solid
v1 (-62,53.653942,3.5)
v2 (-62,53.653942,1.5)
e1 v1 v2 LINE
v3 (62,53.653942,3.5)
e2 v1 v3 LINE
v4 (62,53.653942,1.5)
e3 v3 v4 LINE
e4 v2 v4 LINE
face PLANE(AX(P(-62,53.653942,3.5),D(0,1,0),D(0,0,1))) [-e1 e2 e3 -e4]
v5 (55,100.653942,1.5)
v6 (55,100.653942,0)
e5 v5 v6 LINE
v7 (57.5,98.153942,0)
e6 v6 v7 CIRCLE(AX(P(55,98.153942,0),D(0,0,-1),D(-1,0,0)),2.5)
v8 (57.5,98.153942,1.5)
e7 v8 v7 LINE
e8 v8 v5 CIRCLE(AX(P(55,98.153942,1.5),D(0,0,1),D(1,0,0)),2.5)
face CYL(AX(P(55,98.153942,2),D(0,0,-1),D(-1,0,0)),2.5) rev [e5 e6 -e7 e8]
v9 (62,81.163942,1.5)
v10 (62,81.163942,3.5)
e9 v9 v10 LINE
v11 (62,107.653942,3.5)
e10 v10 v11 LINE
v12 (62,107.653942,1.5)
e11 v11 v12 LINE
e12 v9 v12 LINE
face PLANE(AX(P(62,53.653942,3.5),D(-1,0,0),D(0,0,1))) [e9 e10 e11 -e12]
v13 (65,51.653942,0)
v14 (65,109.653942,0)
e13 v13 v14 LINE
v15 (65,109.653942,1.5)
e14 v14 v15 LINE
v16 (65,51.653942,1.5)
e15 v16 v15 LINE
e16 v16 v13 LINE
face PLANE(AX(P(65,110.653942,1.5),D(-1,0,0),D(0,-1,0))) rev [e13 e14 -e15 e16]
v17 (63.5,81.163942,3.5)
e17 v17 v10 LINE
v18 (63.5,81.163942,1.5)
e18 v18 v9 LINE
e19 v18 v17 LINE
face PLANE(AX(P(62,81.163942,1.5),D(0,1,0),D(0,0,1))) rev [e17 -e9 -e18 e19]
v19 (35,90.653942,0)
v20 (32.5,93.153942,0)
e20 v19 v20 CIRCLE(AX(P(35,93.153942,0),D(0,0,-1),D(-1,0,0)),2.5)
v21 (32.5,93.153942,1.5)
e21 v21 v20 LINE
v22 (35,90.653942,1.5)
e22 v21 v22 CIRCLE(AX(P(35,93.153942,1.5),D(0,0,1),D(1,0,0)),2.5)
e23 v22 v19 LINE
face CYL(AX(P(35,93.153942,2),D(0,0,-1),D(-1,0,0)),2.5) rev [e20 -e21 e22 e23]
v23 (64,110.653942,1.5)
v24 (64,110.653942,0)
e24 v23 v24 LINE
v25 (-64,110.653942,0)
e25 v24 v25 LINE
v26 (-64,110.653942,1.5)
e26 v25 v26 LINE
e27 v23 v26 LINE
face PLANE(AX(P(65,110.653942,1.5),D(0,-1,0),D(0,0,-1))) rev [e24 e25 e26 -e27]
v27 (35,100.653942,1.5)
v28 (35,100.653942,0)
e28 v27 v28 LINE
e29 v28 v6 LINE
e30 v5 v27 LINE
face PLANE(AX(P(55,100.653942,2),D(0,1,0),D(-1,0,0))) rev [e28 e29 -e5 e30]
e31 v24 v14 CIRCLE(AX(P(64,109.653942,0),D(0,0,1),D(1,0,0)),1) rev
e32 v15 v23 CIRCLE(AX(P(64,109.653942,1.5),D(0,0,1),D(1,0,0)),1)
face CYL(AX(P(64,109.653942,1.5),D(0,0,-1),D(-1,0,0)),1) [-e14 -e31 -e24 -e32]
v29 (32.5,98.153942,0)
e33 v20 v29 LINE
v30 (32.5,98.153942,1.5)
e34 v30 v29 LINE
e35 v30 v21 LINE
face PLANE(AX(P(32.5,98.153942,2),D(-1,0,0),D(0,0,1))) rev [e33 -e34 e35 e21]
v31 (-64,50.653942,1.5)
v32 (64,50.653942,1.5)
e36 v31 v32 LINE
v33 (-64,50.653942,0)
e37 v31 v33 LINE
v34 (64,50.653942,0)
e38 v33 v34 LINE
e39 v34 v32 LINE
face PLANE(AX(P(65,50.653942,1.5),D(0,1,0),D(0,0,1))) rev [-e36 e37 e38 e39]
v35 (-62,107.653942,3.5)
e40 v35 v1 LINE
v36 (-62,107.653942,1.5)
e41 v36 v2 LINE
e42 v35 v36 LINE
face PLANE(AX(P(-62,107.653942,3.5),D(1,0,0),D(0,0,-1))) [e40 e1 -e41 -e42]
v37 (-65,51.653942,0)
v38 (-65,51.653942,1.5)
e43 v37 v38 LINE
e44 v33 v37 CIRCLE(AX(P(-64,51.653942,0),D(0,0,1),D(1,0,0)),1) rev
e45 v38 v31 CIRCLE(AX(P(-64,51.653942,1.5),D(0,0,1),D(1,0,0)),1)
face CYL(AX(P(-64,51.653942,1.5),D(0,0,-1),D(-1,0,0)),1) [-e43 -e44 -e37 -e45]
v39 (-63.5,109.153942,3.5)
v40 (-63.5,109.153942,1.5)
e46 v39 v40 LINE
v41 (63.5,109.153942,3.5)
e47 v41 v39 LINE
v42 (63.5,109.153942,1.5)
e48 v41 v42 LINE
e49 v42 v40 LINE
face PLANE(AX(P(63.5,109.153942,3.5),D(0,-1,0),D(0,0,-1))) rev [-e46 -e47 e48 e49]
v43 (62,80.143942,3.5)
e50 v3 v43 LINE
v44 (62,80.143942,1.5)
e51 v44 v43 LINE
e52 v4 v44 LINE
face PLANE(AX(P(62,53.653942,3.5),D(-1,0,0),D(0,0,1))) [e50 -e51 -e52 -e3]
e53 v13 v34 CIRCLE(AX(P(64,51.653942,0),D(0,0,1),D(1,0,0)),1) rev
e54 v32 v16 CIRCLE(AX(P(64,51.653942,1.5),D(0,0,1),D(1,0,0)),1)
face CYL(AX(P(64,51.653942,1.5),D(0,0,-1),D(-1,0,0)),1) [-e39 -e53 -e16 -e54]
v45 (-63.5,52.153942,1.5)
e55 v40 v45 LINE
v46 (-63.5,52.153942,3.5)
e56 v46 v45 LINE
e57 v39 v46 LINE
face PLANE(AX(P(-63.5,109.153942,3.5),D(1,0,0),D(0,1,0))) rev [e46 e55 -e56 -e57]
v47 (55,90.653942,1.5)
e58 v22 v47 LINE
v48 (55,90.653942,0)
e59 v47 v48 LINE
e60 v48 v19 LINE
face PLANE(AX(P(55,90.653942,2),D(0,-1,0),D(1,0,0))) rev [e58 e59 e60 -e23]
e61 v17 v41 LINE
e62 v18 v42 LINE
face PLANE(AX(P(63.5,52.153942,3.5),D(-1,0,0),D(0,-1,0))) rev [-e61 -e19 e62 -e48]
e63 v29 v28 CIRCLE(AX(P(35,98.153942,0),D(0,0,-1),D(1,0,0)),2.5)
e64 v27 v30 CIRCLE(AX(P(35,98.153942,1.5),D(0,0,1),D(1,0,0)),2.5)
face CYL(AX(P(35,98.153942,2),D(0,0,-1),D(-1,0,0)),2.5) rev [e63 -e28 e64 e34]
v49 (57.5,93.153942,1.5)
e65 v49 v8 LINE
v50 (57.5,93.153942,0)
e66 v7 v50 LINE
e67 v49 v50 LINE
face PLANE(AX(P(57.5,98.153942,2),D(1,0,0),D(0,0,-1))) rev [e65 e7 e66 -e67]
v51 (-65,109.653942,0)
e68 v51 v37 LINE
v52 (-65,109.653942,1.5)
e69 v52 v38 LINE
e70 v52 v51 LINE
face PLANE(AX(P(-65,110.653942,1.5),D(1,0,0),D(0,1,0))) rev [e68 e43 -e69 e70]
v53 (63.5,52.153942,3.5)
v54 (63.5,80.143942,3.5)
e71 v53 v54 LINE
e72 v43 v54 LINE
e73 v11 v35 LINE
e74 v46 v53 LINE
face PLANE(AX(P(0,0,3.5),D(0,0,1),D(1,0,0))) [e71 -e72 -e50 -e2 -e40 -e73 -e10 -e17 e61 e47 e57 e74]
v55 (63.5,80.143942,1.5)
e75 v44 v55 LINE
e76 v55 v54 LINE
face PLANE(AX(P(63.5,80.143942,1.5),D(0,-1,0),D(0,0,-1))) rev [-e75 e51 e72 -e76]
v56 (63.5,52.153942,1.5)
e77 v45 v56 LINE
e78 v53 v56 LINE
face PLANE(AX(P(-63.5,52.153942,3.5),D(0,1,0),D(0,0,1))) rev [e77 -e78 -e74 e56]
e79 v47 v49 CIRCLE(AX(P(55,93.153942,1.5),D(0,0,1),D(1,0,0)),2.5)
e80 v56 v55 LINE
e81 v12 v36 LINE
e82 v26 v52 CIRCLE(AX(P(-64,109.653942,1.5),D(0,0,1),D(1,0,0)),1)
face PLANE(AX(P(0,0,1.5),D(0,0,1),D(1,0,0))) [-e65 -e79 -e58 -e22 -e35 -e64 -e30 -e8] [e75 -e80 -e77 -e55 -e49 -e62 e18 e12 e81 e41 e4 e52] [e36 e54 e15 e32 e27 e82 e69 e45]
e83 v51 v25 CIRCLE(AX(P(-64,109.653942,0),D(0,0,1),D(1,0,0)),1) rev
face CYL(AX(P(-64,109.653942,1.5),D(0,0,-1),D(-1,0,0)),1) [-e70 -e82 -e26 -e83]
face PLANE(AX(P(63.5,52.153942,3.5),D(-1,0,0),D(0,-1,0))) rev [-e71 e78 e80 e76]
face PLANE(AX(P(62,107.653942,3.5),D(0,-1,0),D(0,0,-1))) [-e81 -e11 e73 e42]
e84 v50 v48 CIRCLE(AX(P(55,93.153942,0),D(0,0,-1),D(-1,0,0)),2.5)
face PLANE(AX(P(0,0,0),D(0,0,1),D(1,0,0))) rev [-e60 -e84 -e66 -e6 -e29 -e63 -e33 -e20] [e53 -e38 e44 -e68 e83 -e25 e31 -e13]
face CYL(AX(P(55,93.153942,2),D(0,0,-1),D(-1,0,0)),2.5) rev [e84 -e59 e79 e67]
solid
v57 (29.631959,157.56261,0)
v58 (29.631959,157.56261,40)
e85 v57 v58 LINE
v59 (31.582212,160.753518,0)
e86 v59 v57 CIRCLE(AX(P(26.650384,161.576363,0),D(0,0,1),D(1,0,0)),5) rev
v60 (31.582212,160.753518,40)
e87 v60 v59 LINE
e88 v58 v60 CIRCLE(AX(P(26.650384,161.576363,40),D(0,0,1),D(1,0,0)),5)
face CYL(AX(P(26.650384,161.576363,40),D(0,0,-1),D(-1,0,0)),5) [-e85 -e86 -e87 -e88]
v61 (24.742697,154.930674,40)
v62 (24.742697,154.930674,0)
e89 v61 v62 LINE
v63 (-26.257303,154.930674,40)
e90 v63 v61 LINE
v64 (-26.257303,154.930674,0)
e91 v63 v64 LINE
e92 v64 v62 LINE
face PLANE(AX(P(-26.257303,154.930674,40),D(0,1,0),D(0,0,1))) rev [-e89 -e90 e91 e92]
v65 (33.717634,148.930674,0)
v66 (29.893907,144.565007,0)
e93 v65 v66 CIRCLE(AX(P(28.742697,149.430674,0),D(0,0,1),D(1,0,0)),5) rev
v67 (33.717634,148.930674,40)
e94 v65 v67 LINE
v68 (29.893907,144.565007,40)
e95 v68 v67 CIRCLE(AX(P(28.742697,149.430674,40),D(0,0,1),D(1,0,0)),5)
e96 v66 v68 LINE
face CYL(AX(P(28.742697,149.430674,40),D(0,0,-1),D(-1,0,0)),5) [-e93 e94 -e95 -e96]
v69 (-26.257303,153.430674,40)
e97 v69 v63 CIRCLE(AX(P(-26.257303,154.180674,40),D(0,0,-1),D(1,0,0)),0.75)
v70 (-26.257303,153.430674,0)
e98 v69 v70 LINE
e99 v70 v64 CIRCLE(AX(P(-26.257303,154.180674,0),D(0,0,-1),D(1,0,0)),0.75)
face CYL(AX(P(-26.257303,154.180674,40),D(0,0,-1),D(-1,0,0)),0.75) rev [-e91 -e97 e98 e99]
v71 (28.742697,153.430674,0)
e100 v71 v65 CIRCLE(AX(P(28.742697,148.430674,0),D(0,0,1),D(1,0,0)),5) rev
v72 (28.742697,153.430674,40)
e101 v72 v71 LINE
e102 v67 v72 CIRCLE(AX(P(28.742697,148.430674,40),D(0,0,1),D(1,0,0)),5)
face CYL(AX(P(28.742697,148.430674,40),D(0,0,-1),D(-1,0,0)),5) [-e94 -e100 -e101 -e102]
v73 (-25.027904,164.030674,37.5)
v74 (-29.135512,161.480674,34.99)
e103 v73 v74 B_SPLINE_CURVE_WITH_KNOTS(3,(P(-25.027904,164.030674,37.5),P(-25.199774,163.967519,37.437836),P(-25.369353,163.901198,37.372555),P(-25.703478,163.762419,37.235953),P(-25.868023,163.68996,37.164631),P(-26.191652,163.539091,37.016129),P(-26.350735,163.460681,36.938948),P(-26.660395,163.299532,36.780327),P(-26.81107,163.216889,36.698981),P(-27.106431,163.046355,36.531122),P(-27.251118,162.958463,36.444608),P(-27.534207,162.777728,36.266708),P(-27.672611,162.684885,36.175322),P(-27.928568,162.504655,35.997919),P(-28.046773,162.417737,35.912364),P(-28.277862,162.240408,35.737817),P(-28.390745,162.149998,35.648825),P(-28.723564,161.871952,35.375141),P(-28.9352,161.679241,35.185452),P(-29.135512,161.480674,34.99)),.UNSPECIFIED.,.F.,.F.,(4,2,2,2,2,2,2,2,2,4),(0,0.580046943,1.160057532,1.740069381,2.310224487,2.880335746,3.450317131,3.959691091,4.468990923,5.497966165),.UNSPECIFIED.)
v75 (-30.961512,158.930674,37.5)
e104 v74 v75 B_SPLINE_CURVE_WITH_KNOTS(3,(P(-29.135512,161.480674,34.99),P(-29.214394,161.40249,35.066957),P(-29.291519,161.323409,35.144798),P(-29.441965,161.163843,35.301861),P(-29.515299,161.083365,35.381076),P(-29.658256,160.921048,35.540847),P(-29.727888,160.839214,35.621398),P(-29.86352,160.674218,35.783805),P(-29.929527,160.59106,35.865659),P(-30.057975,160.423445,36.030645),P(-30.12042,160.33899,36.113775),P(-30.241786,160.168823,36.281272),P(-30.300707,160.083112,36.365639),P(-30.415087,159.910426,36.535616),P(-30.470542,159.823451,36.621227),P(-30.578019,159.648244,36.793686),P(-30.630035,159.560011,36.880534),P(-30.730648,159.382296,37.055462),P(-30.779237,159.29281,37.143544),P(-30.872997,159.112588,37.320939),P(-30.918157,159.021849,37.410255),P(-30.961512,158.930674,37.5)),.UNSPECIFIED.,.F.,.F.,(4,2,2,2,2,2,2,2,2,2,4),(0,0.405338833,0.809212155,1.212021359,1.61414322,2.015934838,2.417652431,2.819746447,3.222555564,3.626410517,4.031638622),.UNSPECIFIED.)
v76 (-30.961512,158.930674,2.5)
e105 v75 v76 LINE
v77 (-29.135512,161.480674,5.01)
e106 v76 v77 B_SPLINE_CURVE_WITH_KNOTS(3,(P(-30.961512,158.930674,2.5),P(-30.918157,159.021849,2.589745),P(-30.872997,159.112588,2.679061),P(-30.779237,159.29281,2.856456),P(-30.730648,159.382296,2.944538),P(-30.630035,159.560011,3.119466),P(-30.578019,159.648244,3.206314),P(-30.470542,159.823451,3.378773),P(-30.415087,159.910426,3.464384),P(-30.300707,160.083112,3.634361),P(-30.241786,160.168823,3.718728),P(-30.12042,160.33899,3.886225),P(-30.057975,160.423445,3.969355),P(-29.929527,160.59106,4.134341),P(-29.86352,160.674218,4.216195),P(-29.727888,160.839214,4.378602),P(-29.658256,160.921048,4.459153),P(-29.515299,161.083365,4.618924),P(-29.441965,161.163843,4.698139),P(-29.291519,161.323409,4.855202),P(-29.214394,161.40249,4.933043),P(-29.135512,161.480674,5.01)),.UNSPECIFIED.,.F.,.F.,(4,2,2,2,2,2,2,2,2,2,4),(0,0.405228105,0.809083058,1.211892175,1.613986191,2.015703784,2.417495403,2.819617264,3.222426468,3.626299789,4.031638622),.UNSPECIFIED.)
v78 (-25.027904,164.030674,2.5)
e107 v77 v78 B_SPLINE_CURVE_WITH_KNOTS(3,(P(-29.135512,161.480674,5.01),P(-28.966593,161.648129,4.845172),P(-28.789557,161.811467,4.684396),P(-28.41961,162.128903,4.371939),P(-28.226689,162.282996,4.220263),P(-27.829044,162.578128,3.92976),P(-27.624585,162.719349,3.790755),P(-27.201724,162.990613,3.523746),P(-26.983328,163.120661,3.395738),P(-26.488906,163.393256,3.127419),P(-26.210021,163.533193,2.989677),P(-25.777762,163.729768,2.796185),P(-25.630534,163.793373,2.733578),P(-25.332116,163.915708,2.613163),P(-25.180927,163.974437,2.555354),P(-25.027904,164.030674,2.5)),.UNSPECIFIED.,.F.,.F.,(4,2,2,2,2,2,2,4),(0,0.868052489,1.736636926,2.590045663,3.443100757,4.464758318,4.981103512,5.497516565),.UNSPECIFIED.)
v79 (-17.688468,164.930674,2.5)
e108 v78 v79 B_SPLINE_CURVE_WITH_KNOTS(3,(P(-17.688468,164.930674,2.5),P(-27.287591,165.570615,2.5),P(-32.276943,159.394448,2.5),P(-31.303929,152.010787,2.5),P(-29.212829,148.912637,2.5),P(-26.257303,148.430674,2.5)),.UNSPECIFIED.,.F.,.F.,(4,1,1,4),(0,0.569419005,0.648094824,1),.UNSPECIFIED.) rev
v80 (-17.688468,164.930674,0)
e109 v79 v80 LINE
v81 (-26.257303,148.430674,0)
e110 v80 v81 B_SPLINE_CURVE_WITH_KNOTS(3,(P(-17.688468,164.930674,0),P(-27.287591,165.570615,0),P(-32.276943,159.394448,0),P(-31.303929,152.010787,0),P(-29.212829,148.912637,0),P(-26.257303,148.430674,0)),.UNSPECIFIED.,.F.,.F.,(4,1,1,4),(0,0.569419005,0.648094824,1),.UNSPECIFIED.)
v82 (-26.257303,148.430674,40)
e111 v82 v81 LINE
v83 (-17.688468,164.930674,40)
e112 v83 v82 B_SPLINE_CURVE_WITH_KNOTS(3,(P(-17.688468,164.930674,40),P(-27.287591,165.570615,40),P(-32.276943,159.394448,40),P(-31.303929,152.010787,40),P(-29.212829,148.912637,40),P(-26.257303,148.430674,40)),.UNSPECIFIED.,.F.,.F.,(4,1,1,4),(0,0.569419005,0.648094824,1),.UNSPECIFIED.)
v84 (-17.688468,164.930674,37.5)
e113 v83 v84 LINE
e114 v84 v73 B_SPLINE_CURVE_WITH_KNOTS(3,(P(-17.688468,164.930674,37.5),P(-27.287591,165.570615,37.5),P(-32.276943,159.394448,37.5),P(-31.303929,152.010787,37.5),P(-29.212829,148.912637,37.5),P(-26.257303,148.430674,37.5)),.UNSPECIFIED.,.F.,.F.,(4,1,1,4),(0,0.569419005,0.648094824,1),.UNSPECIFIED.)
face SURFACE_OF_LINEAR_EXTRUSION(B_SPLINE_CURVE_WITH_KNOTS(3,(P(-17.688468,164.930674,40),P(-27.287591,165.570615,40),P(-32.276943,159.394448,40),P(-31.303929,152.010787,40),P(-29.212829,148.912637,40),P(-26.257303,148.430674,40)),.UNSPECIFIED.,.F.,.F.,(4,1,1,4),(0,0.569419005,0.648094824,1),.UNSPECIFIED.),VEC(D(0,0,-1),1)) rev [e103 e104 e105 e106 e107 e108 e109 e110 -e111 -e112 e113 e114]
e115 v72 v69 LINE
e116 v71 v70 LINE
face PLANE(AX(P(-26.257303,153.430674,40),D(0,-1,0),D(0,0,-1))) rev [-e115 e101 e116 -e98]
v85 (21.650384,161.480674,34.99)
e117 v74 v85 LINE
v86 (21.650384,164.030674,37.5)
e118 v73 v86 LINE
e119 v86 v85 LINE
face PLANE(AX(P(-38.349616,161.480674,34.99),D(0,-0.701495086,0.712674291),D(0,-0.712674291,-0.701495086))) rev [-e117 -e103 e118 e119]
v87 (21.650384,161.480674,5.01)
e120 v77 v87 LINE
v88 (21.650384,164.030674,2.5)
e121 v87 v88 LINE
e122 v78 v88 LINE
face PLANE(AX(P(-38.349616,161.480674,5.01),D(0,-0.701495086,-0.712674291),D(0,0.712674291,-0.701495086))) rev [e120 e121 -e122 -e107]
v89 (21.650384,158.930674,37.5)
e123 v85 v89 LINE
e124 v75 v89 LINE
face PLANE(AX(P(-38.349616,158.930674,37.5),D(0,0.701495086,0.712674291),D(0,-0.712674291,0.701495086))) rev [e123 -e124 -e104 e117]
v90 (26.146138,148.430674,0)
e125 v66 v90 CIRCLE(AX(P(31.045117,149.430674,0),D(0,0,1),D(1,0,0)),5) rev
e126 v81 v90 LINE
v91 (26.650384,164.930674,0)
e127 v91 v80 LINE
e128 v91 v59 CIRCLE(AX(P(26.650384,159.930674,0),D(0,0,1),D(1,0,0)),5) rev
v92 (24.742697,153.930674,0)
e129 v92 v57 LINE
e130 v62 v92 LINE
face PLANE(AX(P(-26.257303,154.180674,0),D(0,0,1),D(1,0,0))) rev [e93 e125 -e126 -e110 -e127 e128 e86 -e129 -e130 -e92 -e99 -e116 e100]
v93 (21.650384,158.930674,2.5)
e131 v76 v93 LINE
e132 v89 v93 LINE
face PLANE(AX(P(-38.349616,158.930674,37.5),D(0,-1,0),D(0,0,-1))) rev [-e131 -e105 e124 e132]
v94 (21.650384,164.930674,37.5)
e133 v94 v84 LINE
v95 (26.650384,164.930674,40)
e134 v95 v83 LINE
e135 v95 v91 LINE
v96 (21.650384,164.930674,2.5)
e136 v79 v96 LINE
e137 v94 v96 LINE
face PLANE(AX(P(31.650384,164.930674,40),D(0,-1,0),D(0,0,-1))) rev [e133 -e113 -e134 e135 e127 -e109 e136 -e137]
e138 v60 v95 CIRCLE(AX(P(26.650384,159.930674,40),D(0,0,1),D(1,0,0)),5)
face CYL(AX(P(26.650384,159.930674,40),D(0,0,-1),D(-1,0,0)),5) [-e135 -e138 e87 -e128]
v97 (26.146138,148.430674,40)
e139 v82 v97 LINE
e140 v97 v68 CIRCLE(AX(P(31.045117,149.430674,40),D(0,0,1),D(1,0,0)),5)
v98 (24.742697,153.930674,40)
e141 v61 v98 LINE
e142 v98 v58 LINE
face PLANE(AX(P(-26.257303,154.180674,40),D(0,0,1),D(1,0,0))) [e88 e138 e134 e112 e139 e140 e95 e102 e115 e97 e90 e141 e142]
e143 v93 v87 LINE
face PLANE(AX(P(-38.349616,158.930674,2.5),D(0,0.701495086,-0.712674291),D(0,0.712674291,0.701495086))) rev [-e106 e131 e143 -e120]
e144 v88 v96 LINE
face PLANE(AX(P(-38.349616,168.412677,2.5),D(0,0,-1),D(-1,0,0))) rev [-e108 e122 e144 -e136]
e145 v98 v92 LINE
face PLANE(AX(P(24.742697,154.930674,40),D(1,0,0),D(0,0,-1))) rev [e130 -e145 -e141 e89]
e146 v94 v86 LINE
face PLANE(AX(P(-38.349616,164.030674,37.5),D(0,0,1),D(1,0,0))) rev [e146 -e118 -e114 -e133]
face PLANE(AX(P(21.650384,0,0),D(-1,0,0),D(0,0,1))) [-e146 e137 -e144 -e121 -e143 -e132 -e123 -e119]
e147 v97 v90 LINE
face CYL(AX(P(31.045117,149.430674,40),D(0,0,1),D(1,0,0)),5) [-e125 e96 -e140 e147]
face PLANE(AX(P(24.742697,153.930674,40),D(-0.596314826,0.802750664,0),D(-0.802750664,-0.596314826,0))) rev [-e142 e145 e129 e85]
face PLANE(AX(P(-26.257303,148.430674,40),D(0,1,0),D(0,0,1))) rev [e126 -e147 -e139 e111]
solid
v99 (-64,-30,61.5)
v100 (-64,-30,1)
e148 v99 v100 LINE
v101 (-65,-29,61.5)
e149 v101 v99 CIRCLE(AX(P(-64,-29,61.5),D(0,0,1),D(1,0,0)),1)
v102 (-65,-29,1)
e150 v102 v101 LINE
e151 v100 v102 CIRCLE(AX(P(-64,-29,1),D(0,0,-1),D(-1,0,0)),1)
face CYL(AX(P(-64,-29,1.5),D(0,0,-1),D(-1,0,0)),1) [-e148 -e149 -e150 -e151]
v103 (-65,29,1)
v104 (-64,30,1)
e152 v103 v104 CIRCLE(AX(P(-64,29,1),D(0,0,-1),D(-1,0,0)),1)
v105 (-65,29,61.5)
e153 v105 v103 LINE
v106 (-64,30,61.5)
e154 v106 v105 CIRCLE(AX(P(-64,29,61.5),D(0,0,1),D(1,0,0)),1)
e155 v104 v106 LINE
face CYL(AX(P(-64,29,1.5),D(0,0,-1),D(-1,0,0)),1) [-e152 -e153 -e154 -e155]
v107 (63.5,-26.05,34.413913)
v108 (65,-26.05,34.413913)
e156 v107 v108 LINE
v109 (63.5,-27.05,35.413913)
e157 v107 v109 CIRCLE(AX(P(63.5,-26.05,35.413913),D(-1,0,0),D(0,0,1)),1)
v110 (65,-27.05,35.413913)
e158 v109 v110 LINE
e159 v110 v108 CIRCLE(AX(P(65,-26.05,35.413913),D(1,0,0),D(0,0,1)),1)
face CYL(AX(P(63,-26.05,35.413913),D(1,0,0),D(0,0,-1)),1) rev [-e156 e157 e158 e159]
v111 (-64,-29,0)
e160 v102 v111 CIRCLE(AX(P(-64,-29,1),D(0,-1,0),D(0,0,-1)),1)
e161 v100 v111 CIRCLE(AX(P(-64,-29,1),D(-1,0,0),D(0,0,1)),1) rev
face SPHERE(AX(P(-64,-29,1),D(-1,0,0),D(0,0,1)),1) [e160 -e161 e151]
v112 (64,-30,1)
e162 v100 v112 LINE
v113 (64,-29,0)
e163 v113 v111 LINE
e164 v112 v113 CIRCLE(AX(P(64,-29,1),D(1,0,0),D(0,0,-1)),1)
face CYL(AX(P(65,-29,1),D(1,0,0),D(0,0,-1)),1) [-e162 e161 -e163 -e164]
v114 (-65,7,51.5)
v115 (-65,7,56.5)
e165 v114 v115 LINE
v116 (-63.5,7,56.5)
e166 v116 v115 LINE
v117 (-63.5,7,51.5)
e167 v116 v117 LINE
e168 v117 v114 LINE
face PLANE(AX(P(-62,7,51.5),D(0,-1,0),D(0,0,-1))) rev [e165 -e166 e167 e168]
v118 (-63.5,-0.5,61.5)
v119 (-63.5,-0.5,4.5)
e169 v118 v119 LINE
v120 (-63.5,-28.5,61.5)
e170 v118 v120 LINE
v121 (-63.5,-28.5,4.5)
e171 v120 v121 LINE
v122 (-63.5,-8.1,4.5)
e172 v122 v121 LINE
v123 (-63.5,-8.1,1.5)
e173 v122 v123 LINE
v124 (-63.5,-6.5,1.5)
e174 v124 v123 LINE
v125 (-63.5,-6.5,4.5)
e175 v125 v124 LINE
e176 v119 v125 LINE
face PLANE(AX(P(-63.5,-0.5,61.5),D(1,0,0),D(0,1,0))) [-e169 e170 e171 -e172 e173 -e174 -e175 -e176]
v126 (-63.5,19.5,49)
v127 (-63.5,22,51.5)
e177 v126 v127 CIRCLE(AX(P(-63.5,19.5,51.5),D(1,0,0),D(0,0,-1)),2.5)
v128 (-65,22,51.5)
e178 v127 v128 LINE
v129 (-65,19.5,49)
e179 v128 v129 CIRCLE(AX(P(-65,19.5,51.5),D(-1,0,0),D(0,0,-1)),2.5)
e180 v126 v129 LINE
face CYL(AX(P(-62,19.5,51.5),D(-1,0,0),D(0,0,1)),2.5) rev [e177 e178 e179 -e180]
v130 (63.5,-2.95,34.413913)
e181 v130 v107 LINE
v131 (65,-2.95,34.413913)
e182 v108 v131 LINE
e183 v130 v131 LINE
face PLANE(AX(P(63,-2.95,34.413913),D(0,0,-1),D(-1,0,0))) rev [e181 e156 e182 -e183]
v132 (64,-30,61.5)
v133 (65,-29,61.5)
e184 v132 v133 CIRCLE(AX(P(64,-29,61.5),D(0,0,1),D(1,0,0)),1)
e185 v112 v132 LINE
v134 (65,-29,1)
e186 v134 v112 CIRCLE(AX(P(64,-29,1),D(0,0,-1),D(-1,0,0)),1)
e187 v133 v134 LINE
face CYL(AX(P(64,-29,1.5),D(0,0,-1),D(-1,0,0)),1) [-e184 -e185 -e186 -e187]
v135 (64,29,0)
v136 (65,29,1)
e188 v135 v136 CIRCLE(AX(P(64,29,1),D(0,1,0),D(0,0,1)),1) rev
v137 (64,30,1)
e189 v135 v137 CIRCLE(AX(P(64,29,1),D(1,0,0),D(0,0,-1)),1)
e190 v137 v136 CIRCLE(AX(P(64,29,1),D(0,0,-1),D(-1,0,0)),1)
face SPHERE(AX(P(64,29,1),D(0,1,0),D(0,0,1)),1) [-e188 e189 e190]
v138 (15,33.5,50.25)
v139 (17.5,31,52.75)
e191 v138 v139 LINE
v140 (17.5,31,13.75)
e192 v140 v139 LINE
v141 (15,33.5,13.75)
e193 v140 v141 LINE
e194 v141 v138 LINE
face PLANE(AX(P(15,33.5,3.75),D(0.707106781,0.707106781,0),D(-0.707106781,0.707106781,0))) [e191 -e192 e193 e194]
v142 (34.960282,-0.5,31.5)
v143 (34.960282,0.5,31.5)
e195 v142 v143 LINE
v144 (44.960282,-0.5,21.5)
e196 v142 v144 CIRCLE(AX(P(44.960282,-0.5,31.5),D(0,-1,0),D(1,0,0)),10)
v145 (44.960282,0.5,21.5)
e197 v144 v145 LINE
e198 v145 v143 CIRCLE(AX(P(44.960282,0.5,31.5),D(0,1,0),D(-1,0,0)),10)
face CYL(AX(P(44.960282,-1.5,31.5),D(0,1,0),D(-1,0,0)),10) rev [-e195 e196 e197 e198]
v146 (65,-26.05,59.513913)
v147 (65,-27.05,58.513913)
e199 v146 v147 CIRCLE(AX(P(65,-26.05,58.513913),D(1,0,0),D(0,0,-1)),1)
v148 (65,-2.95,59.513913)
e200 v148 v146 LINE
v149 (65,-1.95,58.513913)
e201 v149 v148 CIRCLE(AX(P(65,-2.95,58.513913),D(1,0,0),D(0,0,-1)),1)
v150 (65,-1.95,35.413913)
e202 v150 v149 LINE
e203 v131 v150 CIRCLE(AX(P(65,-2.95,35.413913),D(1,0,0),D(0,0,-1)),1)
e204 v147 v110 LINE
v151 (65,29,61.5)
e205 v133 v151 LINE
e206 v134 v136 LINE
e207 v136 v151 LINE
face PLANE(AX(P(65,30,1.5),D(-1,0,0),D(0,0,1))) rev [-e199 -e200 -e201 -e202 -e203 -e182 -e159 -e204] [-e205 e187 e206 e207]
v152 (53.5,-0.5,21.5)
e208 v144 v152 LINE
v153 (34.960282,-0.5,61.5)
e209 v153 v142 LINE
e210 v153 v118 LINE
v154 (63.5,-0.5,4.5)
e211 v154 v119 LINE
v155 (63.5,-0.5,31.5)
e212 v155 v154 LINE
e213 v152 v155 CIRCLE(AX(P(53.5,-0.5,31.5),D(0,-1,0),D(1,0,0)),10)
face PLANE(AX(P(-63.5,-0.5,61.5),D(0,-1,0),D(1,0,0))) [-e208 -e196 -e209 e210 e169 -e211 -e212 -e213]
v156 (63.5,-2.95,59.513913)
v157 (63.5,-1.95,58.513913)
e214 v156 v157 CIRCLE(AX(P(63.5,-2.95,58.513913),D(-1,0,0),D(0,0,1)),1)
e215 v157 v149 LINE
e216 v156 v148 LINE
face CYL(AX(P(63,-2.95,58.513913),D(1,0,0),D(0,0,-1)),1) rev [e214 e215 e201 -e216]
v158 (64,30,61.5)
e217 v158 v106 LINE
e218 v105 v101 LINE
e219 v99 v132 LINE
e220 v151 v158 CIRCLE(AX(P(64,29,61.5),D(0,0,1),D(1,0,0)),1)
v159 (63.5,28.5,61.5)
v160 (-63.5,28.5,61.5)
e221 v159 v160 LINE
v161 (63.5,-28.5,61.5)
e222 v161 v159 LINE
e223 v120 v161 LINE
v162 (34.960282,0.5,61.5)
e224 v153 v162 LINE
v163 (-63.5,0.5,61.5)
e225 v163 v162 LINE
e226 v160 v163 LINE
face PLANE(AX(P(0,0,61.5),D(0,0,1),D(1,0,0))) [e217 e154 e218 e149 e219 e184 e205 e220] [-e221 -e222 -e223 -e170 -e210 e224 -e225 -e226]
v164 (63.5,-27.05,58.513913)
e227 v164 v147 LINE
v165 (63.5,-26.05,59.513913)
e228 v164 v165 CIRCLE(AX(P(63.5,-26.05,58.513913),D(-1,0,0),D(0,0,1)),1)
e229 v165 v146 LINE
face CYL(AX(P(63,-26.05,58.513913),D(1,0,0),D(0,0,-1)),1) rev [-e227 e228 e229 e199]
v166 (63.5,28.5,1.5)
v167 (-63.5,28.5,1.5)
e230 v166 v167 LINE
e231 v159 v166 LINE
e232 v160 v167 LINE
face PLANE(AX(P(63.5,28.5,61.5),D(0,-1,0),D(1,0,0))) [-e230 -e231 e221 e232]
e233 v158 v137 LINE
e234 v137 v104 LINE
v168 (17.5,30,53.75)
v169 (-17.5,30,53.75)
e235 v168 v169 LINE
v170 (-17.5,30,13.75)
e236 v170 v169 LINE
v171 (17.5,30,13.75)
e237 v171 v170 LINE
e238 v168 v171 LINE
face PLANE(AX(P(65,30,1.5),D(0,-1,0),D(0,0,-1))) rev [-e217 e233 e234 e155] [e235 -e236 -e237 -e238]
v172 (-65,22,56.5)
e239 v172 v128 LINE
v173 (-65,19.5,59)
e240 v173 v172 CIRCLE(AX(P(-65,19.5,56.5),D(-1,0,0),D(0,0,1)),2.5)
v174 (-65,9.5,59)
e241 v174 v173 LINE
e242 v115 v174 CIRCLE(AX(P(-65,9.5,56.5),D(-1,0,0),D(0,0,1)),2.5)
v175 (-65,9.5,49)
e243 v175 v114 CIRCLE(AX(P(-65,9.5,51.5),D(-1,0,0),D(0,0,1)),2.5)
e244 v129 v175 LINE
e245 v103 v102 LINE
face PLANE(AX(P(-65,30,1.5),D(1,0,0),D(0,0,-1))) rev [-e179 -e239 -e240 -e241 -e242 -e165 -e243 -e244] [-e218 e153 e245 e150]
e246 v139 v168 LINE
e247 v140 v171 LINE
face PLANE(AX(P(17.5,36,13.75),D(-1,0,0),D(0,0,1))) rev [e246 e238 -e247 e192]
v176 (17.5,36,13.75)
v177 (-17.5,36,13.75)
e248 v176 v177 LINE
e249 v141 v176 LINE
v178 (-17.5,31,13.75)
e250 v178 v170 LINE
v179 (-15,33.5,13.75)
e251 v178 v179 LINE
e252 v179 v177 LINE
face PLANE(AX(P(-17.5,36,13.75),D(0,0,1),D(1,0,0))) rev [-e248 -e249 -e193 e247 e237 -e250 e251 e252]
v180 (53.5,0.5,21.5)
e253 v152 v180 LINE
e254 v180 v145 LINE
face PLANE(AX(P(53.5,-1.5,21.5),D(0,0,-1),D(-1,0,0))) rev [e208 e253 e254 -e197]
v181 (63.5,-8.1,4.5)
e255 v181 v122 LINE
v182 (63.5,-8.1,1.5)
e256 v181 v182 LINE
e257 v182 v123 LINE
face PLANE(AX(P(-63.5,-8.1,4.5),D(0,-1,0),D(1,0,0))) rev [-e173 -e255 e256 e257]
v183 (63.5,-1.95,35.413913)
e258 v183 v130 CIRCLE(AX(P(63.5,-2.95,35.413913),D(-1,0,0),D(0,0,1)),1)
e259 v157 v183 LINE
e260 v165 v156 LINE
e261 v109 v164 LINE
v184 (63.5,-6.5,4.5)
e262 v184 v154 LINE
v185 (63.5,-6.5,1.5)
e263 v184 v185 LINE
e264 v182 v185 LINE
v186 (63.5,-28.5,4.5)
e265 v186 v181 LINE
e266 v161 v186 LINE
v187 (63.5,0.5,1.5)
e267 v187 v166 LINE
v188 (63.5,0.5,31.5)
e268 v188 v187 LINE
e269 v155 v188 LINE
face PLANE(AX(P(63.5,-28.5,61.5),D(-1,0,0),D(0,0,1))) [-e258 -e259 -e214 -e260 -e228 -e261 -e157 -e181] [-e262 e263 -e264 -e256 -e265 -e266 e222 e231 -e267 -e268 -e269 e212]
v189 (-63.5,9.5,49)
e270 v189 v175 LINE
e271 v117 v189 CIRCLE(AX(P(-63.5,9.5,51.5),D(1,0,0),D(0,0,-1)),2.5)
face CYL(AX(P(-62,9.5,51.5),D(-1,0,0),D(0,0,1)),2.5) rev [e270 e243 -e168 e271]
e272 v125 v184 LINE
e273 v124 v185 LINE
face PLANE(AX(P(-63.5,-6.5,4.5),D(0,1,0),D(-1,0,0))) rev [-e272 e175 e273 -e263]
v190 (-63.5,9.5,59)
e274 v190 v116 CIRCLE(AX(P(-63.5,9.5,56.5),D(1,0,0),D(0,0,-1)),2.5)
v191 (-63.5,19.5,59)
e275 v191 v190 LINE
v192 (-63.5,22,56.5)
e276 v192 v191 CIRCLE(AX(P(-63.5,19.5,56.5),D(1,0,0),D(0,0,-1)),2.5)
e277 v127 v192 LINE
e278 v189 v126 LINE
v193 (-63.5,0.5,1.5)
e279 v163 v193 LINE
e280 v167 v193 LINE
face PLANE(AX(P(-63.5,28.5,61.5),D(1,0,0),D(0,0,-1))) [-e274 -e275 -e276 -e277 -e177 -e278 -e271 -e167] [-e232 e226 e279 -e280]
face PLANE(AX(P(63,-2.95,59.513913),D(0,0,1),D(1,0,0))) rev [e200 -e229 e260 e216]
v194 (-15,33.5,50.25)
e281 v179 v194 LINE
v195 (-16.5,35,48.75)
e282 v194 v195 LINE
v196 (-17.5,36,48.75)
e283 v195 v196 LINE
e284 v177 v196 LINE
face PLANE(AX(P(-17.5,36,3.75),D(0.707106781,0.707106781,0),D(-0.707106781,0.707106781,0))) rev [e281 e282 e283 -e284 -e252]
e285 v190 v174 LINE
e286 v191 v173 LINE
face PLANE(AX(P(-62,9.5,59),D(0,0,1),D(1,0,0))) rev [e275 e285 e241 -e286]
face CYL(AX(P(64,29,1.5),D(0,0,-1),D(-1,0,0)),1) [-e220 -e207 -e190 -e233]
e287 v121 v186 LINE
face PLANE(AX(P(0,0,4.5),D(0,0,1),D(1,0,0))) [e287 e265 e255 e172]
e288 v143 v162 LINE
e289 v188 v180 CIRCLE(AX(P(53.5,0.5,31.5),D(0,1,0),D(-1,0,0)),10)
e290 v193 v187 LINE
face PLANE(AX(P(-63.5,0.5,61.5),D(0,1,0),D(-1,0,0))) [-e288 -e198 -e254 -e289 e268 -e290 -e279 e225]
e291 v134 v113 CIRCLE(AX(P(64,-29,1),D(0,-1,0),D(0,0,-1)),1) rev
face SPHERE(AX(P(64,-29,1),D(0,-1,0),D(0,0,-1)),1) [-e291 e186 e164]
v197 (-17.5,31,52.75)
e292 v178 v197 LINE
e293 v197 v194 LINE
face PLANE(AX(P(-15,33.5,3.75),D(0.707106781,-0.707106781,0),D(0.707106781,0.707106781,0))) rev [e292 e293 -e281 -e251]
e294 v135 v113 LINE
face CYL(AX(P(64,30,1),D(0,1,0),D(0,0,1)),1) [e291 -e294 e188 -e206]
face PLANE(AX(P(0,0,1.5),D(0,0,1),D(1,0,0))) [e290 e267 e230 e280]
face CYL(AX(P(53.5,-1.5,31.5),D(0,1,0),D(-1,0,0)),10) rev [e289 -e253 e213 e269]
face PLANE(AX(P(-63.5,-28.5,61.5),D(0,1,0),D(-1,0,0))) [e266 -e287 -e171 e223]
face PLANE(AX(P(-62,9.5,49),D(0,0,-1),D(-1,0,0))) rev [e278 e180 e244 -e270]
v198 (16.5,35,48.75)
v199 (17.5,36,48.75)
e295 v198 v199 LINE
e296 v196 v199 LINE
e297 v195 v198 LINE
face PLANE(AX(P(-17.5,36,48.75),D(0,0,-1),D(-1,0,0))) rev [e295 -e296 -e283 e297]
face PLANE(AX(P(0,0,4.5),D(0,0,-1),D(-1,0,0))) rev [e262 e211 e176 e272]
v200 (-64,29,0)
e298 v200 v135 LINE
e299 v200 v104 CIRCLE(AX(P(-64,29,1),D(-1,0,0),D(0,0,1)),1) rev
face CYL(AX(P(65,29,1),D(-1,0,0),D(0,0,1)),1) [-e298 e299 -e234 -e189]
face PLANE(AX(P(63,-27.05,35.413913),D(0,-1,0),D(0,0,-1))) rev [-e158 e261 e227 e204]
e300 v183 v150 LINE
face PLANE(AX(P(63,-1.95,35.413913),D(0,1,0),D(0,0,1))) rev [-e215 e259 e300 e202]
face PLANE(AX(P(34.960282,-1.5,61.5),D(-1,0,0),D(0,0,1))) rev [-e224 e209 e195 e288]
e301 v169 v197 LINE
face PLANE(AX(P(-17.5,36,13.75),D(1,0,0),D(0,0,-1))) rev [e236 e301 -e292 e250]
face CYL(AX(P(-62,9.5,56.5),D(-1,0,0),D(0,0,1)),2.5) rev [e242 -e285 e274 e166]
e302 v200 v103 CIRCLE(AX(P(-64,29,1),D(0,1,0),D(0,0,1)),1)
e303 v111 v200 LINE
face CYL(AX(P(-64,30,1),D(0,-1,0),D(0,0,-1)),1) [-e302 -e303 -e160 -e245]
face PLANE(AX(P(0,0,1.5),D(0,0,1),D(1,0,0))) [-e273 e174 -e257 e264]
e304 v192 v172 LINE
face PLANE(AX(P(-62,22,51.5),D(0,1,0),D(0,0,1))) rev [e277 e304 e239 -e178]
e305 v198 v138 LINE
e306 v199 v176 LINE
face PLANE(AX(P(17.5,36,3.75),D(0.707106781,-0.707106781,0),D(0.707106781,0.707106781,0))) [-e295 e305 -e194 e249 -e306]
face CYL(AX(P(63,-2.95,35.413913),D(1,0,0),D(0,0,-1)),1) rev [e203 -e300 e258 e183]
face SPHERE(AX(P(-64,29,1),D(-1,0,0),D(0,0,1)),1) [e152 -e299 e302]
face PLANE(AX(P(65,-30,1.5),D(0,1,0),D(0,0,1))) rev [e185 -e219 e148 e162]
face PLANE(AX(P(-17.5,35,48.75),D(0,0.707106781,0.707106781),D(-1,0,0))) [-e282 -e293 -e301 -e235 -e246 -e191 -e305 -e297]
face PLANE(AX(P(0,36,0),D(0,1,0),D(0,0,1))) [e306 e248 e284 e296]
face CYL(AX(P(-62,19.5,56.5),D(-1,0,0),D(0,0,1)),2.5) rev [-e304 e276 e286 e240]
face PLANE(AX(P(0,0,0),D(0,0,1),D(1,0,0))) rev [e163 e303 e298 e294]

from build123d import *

# Parameters (mm, degrees)
CROQUIS1_W              = 60
CROQUIS1_H              = 130
SALIENTE_EXTRUIR1_DEPTH = 1.5
CROQUIS2_W              = 130
CROQUIS2_H              = 60
CROQUIS2_W_2            = 127
CROQUIS2_H_2            = 28
SALIENTE_EXTRUIR2_DEPTH = 60
CORTAR_EXTRUIR1_DEPTH   = 2
CROQUIS4_W              = 127
CROQUIS4_H              = 6
CROQUIS4_H_2            = 20.4
SALIENTE_EXTRUIR3_DEPTH = 3
CORTAR_EXTRUIR2_DEPTH   = 3
CROQUIS6_W              = 60
CROQUIS6_H              = 130
SALIENTE_EXTRUIR4_DEPTH = 1.5
CROQUIS7_W              = 127
CROQUIS7_H              = 57
CROQUIS7_W_2            = 124
CROQUIS7_H_2            = 54
SALIENTE_EXTRUIR5_DEPTH = 2
CORTAR_EXTRUIR3_DEPTH   = 2
CROQUIS9_W              = 1.5
CROQUIS9_H              = 1.02
CORTAR_EXTRUIR4_DEPTH   = 2
CORTAR_EXTRUIR5_DEPTH   = 2
REDONDEO1_R             = 1
REDONDEO2_R             = 1
CROQUIS11_W             = 35
CROQUIS11_H             = 35
SALIENTE_EXTRUIR8_DEPTH = 6
CORTAR_EXTRUIR7_DEPTH   = 45
CHAFL_N1_SIZE           = 5
SALIENTE_EXTRUIR9_DEPTH = 40
CORTAR_EXTRUIR8_START   = -10
CORTAR_EXTRUIR8_DEPTH   = 60
REDONDEO3_R             = 5


with BuildPart() as part:
    # Croquis1 → Saliente-Extruir1 (new body)
    with BuildSketch(Plane(origin=(0, 0, 0), x_dir=(0, 1, 0), z_dir=(0, 0, 1))):
        Rectangle(CROQUIS1_W, CROQUIS1_H)
    extrude(amount=SALIENTE_EXTRUIR1_DEPTH)

    # Croquis2 → Saliente-Extruir2 (add)
    with BuildSketch(Plane.XY.offset(1.5)):
        Rectangle(CROQUIS2_W, CROQUIS2_H)
        with Locations((0, 14.5)):
            Rectangle(CROQUIS2_W_2, CROQUIS2_H_2, mode=Mode.SUBTRACT)
        with Locations((0, -14.5)):
            Rectangle(CROQUIS2_W_2, CROQUIS2_H_2, mode=Mode.SUBTRACT)
    extrude(amount=SALIENTE_EXTRUIR2_DEPTH)

    # Croquis3 → Cortar-Extruir1 (cut)
    with BuildSketch(Plane(origin=(0, 0.5, 0), x_dir=(-1, 0, 0), z_dir=(0, 1, 0))):
        with BuildLine():
            Line((-63.5, 61.5), (-34.96028162, 61.5))
            Line((-34.96028162, 61.5), (-34.96028162, 31.5))
            ThreePointArc((-34.96028162, 31.5), (-37.889213808, 24.428932188), (-44.96028162, 21.5))
            Line((-44.96028162, 21.5), (-53.5, 21.5))
            ThreePointArc((-53.5, 21.5), (-60.571067812, 24.428932188), (-63.5, 31.5))
            Line((-63.5, 31.5), (-63.5, 61.5))
        make_face()
    extrude(amount=-CORTAR_EXTRUIR1_DEPTH, mode=Mode.SUBTRACT)

    # Croquis4 → Saliente-Extruir3 (add)
    with BuildSketch(Plane.XY.offset(1.5)):
        with Locations((0, -3.5)):
            Rectangle(CROQUIS4_W, CROQUIS4_H)
        with Locations((0, -18.3)):
            Rectangle(CROQUIS4_W, CROQUIS4_H_2)
    extrude(amount=SALIENTE_EXTRUIR3_DEPTH)

    # Croquis5 → Cortar-Extruir2 (cut)
    with BuildSketch(Plane(origin=(-65, 0, 0), x_dir=(0, -1, 0), z_dir=(-1, 0, 0))):
        with BuildLine():
            Line((-9.5, 49), (-19.5, 49))
            ThreePointArc((-19.5, 49), (-21.267766953, 49.732233047), (-22, 51.5))
            Line((-22, 51.5), (-22, 56.5))
            ThreePointArc((-22, 56.5), (-21.267766953, 58.267766953), (-19.5, 59))
            Line((-19.5, 59), (-9.5, 59))
            ThreePointArc((-9.5, 59), (-7.732233047, 58.267766953), (-7, 56.5))
            Line((-7, 56.5), (-7, 51.5))
            ThreePointArc((-7, 51.5), (-7.732233047, 49.732233047), (-9.5, 49))
        make_face()
    extrude(amount=-CORTAR_EXTRUIR2_DEPTH, mode=Mode.SUBTRACT)

    # Croquis10 → Cortar-Extruir5 (cut)
    with BuildSketch(Plane.YZ.offset(65)):
        with BuildLine():
            Line((-2.95, 34.41391254), (-26.05, 34.41391254))
            ThreePointArc((-26.05, 34.41391254), (-26.757106781, 34.706805759), (-27.05, 35.41391254))
            Line((-27.05, 35.41391254), (-27.05, 58.51391254))
            ThreePointArc((-27.05, 58.51391254), (-26.757106781, 59.221019322), (-26.05, 59.51391254))
            Line((-26.05, 59.51391254), (-2.95, 59.51391254))
            ThreePointArc((-2.95, 59.51391254), (-2.242893219, 59.221019322), (-1.95, 58.51391254))
            Line((-1.95, 58.51391254), (-1.95, 35.41391254))
            ThreePointArc((-1.95, 35.41391254), (-2.242893219, 34.706805759), (-2.95, 34.41391254))
        make_face()
    extrude(amount=-CORTAR_EXTRUIR5_DEPTH, mode=Mode.SUBTRACT)

    # Redondeo1
    redondeo1_edges = [part.edges().sort_by_distance(p)[0] for p in [
        (-65, 0, 0),
        (0, 30, 0),
        (65, 0, 0),
        (0, -30, 0),
        (-65, -30, 30.75),
        (-65, 30, 30.75),
        (65, 30, 30.75),
        (65, -30, 30.75),
    ]]
    fillet(redondeo1_edges, radius=REDONDEO1_R)

    # Croquis11 → Saliente-Extruir8 (add)
    with BuildSketch(Plane(origin=(0, 30, 0), x_dir=(-1, 0, 0), z_dir=(0, 1, 0))):
        with Locations((0, 31.25)):
            Rectangle(CROQUIS11_W, CROQUIS11_H)
    extrude(amount=SALIENTE_EXTRUIR8_DEPTH)

    # Croquis15 → Cortar-Extruir7 (cut)
    with BuildSketch(Plane.XY.offset(48.75)):
        Polygon((-17.5, 36), (-15, 33.5), (-17.5, 31), align=None)
    cortar_extruir7 = extrude(amount=-CORTAR_EXTRUIR7_DEPTH, mode=Mode.SUBTRACT)

    # Simetría1: Cortar-Extruir7 across plane
    add(cortar_extruir7.mirror(Plane(origin=(0, 0, 0), x_dir=(0, 0, 1), z_dir=(1, 0, 0))), mode=Mode.SUBTRACT)

    # Chaflán1
    # the kernel refuses this chamfer: 5 mm, written as the material it adds along each edge
    with BuildSketch(Plane(origin=(17.5, 30, 48.75), x_dir=(0, -0.027495876610586317, 0.9996219169112968), z_dir=(-1, 0, 0))) as chafl_n1_piece_1_section:
        Polygon((CHAFL_N1_SIZE * 0.999621916911, CHAFL_N1_SIZE * 0.0274958766106), (-CHAFL_N1_SIZE * 0.0274958766106, CHAFL_N1_SIZE * 0.999621916911), (0, 0), align=None)
    chafl_n1_piece_1 = extrude(amount=35, mode=Mode.PRIVATE)
    chafl_n1_piece_1 = split(chafl_n1_piece_1, bisect_by=Plane(origin=(15.432245285, 33.932245285, 48.975102949), z_dir=(-0.7071067811865482, 0.7071067811865468, 0)), keep=Keep.TOP, mode=Mode.PRIVATE)
    chafl_n1_piece_1 = split(chafl_n1_piece_1, bisect_by=Plane(origin=(14.567754715, 33.932245285, 48.975102949), z_dir=(0.7071067811865462, 0.7071067811865488, 0)), keep=Keep.TOP, mode=Mode.PRIVATE)
    add(chafl_n1_piece_1)
    with BuildSketch(Plane(origin=(17.5, 30, 48.75), x_dir=(0, -0.027495876610586317, 0.9996219169112968), z_dir=(-1, 0, 0))) as chafl_n1_piece_2_section:
        Polygon((CHAFL_N1_SIZE * 0.999621916911, CHAFL_N1_SIZE * 0.0274958766106), (-CHAFL_N1_SIZE * 0.0274958766106, CHAFL_N1_SIZE * 0.999621916911), (0, 0), align=None)
    chafl_n1_piece_2 = extrude(amount=35, mode=Mode.PRIVATE)
    chafl_n1_piece_2 = split(chafl_n1_piece_2, bisect_by=Plane(origin=(13.632899662, 32.132899662, 50.773714866), z_dir=(0.7071067811865482, -0.7071067811865468, 0)), keep=Keep.TOP, mode=Mode.PRIVATE)
    chafl_n1_piece_2 = split(chafl_n1_piece_2, bisect_by=Plane(origin=(16.189237839, 32.310762161, 50.773714866), z_dir=(-0.7071067811865462, -0.7071067811865488, 0)), keep=Keep.TOP, mode=Mode.PRIVATE)
    add(chafl_n1_piece_2)
    with BuildSketch(Plane(origin=(17.5, 30, 48.75), x_dir=(0, -0.027495876610586317, 0.9996219169112968), z_dir=(-1, 0, 0))) as chafl_n1_piece_3_section:
        Polygon((CHAFL_N1_SIZE * 0.999621916911, CHAFL_N1_SIZE * 0.0274958766106), (-CHAFL_N1_SIZE * 0.0274958766106, CHAFL_N1_SIZE * 0.999621916911), (0, 0), align=None)
    chafl_n1_piece_3 = extrude(amount=35, mode=Mode.PRIVATE)
    chafl_n1_piece_3 = split(chafl_n1_piece_3, bisect_by=Plane(origin=(-8.376980727, 40.123019273, 50.346819727), z_dir=(0.7071067811865462, -0.7071067811865488, 0)), keep=Keep.TOP, mode=Mode.PRIVATE)
    chafl_n1_piece_3 = split(chafl_n1_piece_3, bisect_by=Plane(origin=(-6.623019273, 25.123019273, 50.346819727), z_dir=(0.7071067811865482, 0.7071067811865468, 0)), keep=Keep.TOP, mode=Mode.PRIVATE)
    chafl_n1_piece_3 = split(chafl_n1_piece_3, bisect_by=Plane(origin=(6.623019273, 25.123019273, 50.346819727), z_dir=(-0.7071067811865482, 0.7071067811865468, 0)), keep=Keep.TOP, mode=Mode.PRIVATE)
    chafl_n1_piece_3 = split(chafl_n1_piece_3, bisect_by=Plane(origin=(8.376980727, 40.123019273, 50.346819727), z_dir=(-0.7071067811865462, -0.7071067811865488, 0)), keep=Keep.TOP, mode=Mode.PRIVATE)
    add(chafl_n1_piece_3)
    with BuildSketch(Plane(origin=(17.5, 30, 48.75), x_dir=(0, -0.027495876610586317, 0.9996219169112968), z_dir=(-1, 0, 0))) as chafl_n1_piece_4_section:
        Polygon((CHAFL_N1_SIZE * 0.999621916911, CHAFL_N1_SIZE * 0.0274958766106), (-CHAFL_N1_SIZE * 0.0274958766106, CHAFL_N1_SIZE * 0.999621916911), (0, 0), align=None)
    chafl_n1_piece_4 = extrude(amount=35, mode=Mode.PRIVATE)
    chafl_n1_piece_4 = split(chafl_n1_piece_4, bisect_by=Plane(origin=(-14.567754715, 33.932245285, 48.975102949), z_dir=(-0.7071067811865462, 0.7071067811865488, 0)), keep=Keep.TOP, mode=Mode.PRIVATE)
    chafl_n1_piece_4 = split(chafl_n1_piece_4, bisect_by=Plane(origin=(-15.432245285, 33.932245285, 48.975102949), z_dir=(0.7071067811865482, 0.7071067811865468, 0)), keep=Keep.TOP, mode=Mode.PRIVATE)
    add(chafl_n1_piece_4)
    with BuildSketch(Plane(origin=(17.5, 30, 48.75), x_dir=(0, -0.027495876610586317, 0.9996219169112968), z_dir=(-1, 0, 0))) as chafl_n1_piece_5_section:
        Polygon((CHAFL_N1_SIZE * 0.999621916911, CHAFL_N1_SIZE * 0.0274958766106), (-CHAFL_N1_SIZE * 0.0274958766106, CHAFL_N1_SIZE * 0.999621916911), (0, 0), align=None)
    chafl_n1_piece_5 = extrude(amount=35, mode=Mode.PRIVATE)
    chafl_n1_piece_5 = split(chafl_n1_piece_5, bisect_by=Plane(origin=(-16.189237839, 32.310762161, 50.773714866), z_dir=(0.7071067811865462, -0.7071067811865488, 0)), keep=Keep.TOP, mode=Mode.PRIVATE)
    chafl_n1_piece_5 = split(chafl_n1_piece_5, bisect_by=Plane(origin=(-13.632899662, 32.132899662, 50.773714866), z_dir=(-0.7071067811865482, -0.7071067811865468, 0)), keep=Keep.TOP, mode=Mode.PRIVATE)
    add(chafl_n1_piece_5)


with BuildPart() as body_2:
    # Croquis6 → Saliente-Extruir4 (new body)
    with BuildSketch(Plane(origin=(0, 0, 0), x_dir=(0, 1, 0), z_dir=(0, 0, 1))):
        with Locations((80.653942152, 0)):
            Rectangle(CROQUIS6_W, CROQUIS6_H)
    extrude(amount=SALIENTE_EXTRUIR4_DEPTH)

    # Croquis7 → Saliente-Extruir5 (add)
    with BuildSketch(Plane.XY.offset(1.5)):
        with Locations((0, 80.653942152)):
            Rectangle(CROQUIS7_W, CROQUIS7_H)
        with Locations((0, 80.653942152)):
            Rectangle(CROQUIS7_W_2, CROQUIS7_H_2, mode=Mode.SUBTRACT)
    extrude(amount=SALIENTE_EXTRUIR5_DEPTH)

    # Croquis8 → Cortar-Extruir3 (cut)
    with BuildSketch(Plane(origin=(0, 0, 0), x_dir=(1, 0, 0), z_dir=(0, 0, -1))):
        with BuildLine():
            Line((55, -100.653942152), (35, -100.653942152))
            ThreePointArc((35, -100.653942152), (33.232233047, -99.921709105), (32.5, -98.153942152))
            Line((32.5, -98.153942152), (32.5, -93.153942152))
            ThreePointArc((32.5, -93.153942152), (33.232233047, -91.386175199), (35, -90.653942152))
            Line((35, -90.653942152), (55, -90.653942152))
            ThreePointArc((55, -90.653942152), (56.767766953, -91.386175199), (57.5, -93.153942152))
            Line((57.5, -93.153942152), (57.5, -98.153942152))
            ThreePointArc((57.5, -98.153942152), (56.767766953, -99.921709105), (55, -100.653942152))
        make_face()
    extrude(amount=-CORTAR_EXTRUIR3_DEPTH, mode=Mode.SUBTRACT)

    # Croquis9 → Cortar-Extruir4 (cut)
    with BuildSketch(Plane.XY.offset(3.5)):
        with Locations((62.75, 80.653942152)):
            Rectangle(CROQUIS9_W, CROQUIS9_H)
    extrude(amount=-CORTAR_EXTRUIR4_DEPTH, mode=Mode.SUBTRACT)

    # Redondeo2
    redondeo2_edges = [body_2.edges().sort_by_distance(p)[0] for p in [
        (-65, 50.653942152, 0.75),
        (-65, 110.653942152, 0.75),
        (65, 110.653942152, 0.75),
        (65, 50.653942152, 0.75),
    ]]
    fillet(redondeo2_edges, radius=REDONDEO2_R)


with BuildPart() as body_3:
    # Croquis16 → Saliente-Extruir9 (new body)
    with BuildSketch(Plane(origin=(0, 0, 0), x_dir=(0, 1, 0), z_dir=(0, 0, 1))):
        with BuildLine():
            Line((153.430673644, 26.257303068), (153.430673644, -33.742696932))
            Line((153.430673644, -33.742696932), (148.430673644, -33.742696932))
            Line((148.430673644, -33.742696932), (144.430673644, -33.742696932))
            Line((144.430673644, -33.742696932), (144.430673644, -26.146137696))
            Line((144.430673644, -26.146137696), (148.430673644, -26.146137696))
            Line((148.430673644, -26.146137696), (148.430673644, 26.257303068))
            add(Edge.make_bspline(
                [(148.430673644, 26.257303068), (148.912637058, 29.212828549), (152.01078713, 31.303928812), (159.394447974, 32.276943324), (165.570615176, 27.287591474), (164.930673644, 17.6884685)],
                knots=[0, 0, 0, 0, 0.351905176, 0.430580995, 1, 1, 1, 1], degree=3))
            Line((164.930673644, 17.6884685), (164.930673644, -31.650384498))
            Line((164.930673644, -31.650384498), (159.061976165, -31.650384498))
            Line((159.061976165, -31.650384498), (153.930673644, -24.742696932))
            Line((153.930673644, -24.742696932), (154.930673644, -24.742696932))
            Line((154.930673644, -24.742696932), (154.930673644, 26.257303068))
            ThreePointArc((154.930673644, 26.257303068), (154.180673644, 27.007303068), (153.430673644, 26.257303068))
        make_face()
    extrude(amount=SALIENTE_EXTRUIR9_DEPTH)

    # Croquis17 → Cortar-Extruir8 (cut)
    with BuildSketch(Plane.YZ.offset(31.650384498).offset(CORTAR_EXTRUIR8_START)):
        Polygon((158.930673644, 37.5), (161.480673644, 34.99), (164.030673644, 37.5), (168.412676556, 37.5), (168.412676556, 2.5), (164.030673644, 2.5), (161.480673644, 5.01), (158.930673644, 2.5), align=None)
    extrude(amount=-CORTAR_EXTRUIR8_DEPTH, mode=Mode.SUBTRACT)

    # Redondeo3
    # the kernel refuses this fillet: 5 mm, written as the material it takes off along each edge
    with BuildSketch(Plane(origin=(26.146137696, 144.430673644, -12.247448714), x_dir=(1, 0, 0), z_dir=(0, 0, 1))) as redondeo3_piece_1:
        with BuildLine():
            CenterArc((4.898979486, 5), REDONDEO3_R, 191.536959033, 78.463040967)
            Line((0, 4), (-0.09797959, 3.98))
            ThreePointArc((-0.09797959, 3.98), (-0.1, 2), (-0.1, 0))
            Line((-0.1, 0), (0, -0.1))
            Line((0, -0.1), (4.898979486, -0.1))
            Line((4.898979486, -0.1), (4.898979486, 0))
        make_face()
    extrude(amount=64.494897428, mode=Mode.SUBTRACT)
    with BuildSketch(Plane(origin=(33.742696932, 144.430673644, -12.5), x_dir=(0, 1, 0), z_dir=(0, 0, 1)), Plane(origin=(33.742696932, 153.430673644, -12.5), x_dir=(-1, 0, 0), z_dir=(0, 0, 1)), Plane(origin=(31.650384498, 164.930673644, -12.5), x_dir=(-1, 0, 0), z_dir=(0, 0, 1))) as redondeo3_piece_2:
        with BuildLine():
            CenterArc((REDONDEO3_R, REDONDEO3_R), REDONDEO3_R, 180, 90)
            Line((0, REDONDEO3_R), (-REDONDEO3_R * 0.02, REDONDEO3_R))
            Line((-REDONDEO3_R * 0.02, REDONDEO3_R), (-REDONDEO3_R * 0.02, -REDONDEO3_R * 0.02))
            Line((-REDONDEO3_R * 0.02, -REDONDEO3_R * 0.02), (REDONDEO3_R, -REDONDEO3_R * 0.02))
            Line((REDONDEO3_R, -REDONDEO3_R * 0.02), (REDONDEO3_R, 0))
        make_face()
    extrude(amount=65, mode=Mode.SUBTRACT)
    with BuildSketch(Plane(origin=(31.650384498, 159.061976165, -6.285967617), x_dir=(0, 1, 0), z_dir=(0, 0, 1))) as redondeo3_piece_3:
        with BuildLine():
            CenterArc((REDONDEO3_R * 0.502877409395, REDONDEO3_R), REDONDEO3_R, 216.606419901, 53.393580099)
            Line((-REDONDEO3_R * 0.299873254705, REDONDEO3_R * 0.403685174353), (-REDONDEO3_R * 0.315928267987, REDONDEO3_R * 0.39175887784))
            Line((-REDONDEO3_R * 0.315928267987, REDONDEO3_R * 0.39175887784), (-REDONDEO3_R * 0.0100575481879, -REDONDEO3_R * 0.02))
            Line((-REDONDEO3_R * 0.0100575481879, -REDONDEO3_R * 0.02), (REDONDEO3_R * 0.502877409395, -REDONDEO3_R * 0.02))
            Line((REDONDEO3_R * 0.502877409395, -REDONDEO3_R * 0.02), (REDONDEO3_R * 0.502877409395, 0))
        make_face()
    extrude(amount=52.571935235, mode=Mode.SUBTRACT)


solid = Compound([part.part, body_2.part, body_3.part])
